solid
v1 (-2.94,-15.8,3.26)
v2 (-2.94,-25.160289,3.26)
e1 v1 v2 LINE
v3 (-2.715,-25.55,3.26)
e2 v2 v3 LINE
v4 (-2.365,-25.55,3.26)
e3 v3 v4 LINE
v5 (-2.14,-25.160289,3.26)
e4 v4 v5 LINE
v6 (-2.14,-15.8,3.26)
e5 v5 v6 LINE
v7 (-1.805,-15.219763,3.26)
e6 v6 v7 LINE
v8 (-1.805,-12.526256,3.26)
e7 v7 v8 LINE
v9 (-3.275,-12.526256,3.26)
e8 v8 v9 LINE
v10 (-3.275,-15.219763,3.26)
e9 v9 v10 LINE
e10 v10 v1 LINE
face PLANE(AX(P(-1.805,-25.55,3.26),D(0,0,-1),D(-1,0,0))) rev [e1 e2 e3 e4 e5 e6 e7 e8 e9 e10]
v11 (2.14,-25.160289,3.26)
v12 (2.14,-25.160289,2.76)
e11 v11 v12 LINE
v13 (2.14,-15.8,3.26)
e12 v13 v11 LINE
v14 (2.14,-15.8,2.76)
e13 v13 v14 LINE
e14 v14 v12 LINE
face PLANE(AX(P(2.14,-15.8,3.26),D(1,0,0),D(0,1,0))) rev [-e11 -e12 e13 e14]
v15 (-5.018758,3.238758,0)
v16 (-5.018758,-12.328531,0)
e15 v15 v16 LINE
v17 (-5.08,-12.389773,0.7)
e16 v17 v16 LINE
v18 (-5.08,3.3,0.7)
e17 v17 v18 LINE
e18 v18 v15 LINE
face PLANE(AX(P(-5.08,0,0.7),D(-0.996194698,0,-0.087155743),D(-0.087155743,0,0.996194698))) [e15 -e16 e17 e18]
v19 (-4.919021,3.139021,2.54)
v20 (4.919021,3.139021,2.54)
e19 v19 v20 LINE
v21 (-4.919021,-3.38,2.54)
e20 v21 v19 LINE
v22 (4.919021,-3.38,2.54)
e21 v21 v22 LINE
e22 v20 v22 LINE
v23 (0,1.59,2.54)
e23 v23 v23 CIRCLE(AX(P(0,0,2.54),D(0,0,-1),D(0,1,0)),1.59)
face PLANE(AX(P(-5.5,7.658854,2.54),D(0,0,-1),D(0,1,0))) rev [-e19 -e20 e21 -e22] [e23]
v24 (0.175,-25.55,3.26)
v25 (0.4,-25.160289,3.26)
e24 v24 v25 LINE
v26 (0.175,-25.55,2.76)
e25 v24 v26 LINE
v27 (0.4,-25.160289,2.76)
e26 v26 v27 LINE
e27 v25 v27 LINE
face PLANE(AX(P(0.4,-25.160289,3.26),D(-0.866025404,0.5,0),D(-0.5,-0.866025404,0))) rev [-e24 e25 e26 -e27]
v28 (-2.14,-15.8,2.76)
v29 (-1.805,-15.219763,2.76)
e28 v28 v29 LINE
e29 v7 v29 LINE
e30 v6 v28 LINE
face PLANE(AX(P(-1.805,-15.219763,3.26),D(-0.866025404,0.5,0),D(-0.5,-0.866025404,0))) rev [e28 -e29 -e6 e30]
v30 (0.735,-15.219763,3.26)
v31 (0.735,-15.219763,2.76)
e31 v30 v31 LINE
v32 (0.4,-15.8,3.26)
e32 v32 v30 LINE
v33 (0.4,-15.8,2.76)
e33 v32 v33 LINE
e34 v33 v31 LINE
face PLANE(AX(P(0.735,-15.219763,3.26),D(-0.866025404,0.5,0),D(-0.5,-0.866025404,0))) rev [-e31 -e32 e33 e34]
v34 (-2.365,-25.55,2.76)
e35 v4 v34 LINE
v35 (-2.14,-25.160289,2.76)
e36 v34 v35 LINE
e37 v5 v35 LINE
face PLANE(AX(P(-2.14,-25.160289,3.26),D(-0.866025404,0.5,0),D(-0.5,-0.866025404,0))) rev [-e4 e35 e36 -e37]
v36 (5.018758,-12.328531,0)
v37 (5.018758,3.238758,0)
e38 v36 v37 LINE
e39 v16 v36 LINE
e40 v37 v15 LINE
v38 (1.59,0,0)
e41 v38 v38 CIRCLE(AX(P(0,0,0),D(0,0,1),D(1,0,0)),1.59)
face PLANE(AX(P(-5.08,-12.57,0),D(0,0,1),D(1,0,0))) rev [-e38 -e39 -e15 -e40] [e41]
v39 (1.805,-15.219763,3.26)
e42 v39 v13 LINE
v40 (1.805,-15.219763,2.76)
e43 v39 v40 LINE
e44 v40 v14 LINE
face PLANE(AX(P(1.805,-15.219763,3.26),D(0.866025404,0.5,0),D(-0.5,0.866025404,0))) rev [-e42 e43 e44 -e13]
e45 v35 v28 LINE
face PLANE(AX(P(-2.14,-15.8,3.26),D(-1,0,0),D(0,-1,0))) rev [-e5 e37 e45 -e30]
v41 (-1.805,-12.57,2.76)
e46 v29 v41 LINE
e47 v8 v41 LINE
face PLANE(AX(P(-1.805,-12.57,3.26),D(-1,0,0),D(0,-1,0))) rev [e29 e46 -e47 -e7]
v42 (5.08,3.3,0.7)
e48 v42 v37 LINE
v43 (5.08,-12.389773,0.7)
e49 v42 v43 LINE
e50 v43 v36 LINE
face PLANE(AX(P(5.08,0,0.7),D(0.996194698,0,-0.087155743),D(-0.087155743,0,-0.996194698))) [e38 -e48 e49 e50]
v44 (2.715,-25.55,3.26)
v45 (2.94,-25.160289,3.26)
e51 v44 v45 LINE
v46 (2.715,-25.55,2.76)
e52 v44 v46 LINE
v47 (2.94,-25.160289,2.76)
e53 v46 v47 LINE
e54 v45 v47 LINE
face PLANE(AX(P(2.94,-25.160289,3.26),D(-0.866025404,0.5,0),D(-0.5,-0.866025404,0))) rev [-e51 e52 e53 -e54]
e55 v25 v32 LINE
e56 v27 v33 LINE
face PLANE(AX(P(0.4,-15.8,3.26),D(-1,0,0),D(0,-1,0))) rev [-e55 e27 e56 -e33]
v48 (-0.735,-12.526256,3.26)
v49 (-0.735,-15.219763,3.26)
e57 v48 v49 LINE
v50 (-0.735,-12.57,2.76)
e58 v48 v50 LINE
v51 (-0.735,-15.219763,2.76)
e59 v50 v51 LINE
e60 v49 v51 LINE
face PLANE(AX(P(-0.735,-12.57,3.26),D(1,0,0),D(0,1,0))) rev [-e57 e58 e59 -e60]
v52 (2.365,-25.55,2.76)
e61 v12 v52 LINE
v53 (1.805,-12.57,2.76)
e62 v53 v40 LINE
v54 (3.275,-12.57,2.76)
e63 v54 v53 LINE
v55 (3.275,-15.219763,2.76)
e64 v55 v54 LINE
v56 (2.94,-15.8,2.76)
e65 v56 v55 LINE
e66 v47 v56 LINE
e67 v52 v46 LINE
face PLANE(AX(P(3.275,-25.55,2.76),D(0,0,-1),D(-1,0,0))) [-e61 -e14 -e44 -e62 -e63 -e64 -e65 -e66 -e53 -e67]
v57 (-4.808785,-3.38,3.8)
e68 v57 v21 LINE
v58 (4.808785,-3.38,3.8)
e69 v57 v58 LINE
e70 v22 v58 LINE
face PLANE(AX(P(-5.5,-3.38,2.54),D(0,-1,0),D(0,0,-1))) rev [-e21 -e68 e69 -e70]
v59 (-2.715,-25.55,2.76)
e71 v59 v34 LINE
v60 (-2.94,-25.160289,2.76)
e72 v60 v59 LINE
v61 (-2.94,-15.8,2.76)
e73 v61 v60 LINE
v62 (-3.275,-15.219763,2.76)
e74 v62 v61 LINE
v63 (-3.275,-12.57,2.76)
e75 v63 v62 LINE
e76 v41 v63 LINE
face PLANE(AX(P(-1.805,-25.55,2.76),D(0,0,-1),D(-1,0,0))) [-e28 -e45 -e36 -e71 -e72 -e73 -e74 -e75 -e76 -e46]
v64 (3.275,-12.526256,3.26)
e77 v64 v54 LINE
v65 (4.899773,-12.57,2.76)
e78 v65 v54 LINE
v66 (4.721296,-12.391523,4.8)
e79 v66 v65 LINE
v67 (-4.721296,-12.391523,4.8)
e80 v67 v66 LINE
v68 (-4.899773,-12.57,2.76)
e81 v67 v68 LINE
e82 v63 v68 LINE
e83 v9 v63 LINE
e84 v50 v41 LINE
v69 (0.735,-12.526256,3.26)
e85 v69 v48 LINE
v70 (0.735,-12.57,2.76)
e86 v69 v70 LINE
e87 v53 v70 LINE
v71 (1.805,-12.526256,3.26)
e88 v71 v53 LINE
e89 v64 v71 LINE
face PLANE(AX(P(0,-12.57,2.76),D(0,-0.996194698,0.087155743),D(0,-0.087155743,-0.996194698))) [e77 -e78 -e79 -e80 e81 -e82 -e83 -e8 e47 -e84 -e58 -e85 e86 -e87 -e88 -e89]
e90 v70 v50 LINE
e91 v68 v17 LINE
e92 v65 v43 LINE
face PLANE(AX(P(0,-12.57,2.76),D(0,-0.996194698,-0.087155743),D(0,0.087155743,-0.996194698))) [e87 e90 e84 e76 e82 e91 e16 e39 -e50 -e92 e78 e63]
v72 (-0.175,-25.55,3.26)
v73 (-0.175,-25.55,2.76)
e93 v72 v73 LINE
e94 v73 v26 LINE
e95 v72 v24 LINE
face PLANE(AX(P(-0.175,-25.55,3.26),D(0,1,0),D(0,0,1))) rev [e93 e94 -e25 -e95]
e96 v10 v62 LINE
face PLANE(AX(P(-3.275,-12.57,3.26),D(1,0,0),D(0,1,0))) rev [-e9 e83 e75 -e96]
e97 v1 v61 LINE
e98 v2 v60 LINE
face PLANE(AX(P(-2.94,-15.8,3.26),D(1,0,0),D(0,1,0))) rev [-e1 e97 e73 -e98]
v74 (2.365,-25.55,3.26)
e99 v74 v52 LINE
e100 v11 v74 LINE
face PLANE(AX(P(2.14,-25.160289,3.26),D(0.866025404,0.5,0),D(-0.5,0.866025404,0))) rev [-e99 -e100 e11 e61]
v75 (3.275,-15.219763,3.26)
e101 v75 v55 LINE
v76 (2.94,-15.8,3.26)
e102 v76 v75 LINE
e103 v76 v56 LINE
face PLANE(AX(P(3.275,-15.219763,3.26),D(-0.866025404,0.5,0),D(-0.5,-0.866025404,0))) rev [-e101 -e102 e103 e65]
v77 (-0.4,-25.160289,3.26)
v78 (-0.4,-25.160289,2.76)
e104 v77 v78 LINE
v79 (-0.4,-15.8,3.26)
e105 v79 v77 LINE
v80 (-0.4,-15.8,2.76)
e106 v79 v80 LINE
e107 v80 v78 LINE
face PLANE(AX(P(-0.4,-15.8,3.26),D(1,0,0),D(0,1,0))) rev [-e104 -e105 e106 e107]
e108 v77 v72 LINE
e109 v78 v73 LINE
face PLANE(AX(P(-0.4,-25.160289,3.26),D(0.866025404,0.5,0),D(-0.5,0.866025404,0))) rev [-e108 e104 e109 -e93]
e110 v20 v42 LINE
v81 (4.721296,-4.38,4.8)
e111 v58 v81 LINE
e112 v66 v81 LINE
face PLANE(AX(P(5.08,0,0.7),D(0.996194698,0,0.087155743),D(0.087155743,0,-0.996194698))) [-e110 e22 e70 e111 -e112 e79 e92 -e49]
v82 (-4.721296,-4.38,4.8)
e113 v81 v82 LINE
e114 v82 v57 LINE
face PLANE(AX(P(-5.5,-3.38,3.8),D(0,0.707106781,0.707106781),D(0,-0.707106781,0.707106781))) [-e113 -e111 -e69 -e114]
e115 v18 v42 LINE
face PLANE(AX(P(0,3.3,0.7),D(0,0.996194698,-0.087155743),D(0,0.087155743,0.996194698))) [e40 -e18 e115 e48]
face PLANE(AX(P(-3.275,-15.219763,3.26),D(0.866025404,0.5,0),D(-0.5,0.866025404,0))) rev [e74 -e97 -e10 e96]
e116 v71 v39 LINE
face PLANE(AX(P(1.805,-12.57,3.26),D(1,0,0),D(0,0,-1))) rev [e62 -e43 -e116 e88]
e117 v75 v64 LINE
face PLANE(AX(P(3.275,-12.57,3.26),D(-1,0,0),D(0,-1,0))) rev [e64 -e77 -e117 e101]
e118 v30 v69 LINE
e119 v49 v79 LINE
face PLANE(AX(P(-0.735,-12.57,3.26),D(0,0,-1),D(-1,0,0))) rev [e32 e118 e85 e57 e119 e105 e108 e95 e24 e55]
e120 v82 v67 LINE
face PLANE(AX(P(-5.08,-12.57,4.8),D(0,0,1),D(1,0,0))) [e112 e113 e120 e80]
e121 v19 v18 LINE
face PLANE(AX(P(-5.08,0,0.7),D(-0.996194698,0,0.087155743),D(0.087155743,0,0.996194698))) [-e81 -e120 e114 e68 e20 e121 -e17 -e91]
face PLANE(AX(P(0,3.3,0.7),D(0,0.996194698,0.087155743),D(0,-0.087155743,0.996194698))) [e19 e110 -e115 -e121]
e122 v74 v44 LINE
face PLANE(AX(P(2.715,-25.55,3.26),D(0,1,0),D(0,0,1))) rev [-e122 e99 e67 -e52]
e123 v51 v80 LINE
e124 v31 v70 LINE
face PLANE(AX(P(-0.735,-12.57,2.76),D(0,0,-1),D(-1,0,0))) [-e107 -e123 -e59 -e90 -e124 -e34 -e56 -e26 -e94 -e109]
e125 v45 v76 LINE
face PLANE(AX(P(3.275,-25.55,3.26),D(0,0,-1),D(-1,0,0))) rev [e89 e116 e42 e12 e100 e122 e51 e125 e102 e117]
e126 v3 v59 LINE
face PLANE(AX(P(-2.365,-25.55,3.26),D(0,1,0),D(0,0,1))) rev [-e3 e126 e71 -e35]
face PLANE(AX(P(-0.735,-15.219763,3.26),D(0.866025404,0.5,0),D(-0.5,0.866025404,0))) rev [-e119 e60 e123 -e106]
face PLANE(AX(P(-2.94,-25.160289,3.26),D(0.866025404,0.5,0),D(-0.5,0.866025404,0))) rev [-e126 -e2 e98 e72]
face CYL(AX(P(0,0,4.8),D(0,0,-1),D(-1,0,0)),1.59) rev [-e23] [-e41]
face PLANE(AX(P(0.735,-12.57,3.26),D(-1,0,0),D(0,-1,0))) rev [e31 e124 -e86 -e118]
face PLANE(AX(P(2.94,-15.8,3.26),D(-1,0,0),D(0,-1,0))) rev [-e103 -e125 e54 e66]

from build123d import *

# Parameters (mm, degrees)
SKETCH1_W          = 10.16
SKETCH1_H          = 15.87
SKETCH1_R          = 1.59
EXTRUDE1_DEPTH     = 4.8
SKETCH2_W          = 4.533761675
SKETCH2_H          = 11.038854263
CUT_EXTRUDE1_DEPTH = 5.5
CHAMFER1_SIZE      = 1
EXTRUDE2_DEPTH     = 0.5
DRAFT1_START       = -14
DRAFT1_DEPTH       = 17.3
DRAFT1_START_2     = 3.226433484
DRAFT1_2_OUTLINE_W = 14
DRAFT1_2_OUTLINE_H = 3
DRAFT1_2_DEPTH     = 0.773566516
DRAFT2_ANGLE       = -5
DRAFT4_START       = -5.08
DRAFT4_DEPTH       = 10.16
DRAFT4_2_DEPTH     = 1.805
DRAFT4_START_2     = 3.275
DRAFT4_3_DEPTH     = 1.805
DRAFT4_START_3     = -1.805
DRAFT4_4_DEPTH     = 1.07
DRAFT4_START_4     = 0.735
DRAFT4_5_DEPTH     = 1.07
DRAFT3_ANGLE       = 5


with BuildPart() as part:
    # Sketch1 → Extrude1 (new body)
    with BuildSketch(Plane.XY):
        with Locations((0, -4.635)):
            Rectangle(SKETCH1_W, SKETCH1_H)
        Circle(SKETCH1_R, mode=Mode.SUBTRACT)
    extrude(amount=EXTRUDE1_DEPTH)

    # Sketch2 → Cut-Extrude1 (cut, symmetric)
    with BuildSketch(Plane(origin=(0, 0, 0), x_dir=(0, 0, -1), z_dir=(1, 0, 0))):
        with Locations((-4.806880837, 2.139427131)):
            Rectangle(SKETCH2_W, SKETCH2_H)
    extrude(amount=CUT_EXTRUDE1_DEPTH, both=True, mode=Mode.SUBTRACT)

    # Chamfer1
    chamfer1_edges = [part.edges().sort_by_distance(p)[0] for p in [
        (0, -3.38, 4.8),
    ]]
    chamfer(chamfer1_edges, length=CHAMFER1_SIZE)

    # Sketch3 → Extrude2 (add)
    with BuildSketch(Plane.XY.offset(2.76)):
        Polygon((0.735, -12.57), (0.735, -15.219762979), (0.4, -15.8), (0.4, -25.160288568), (0.175, -25.55), (-0.175, -25.55), (-0.4, -25.160288568), (-0.4, -15.8), (-0.735, -15.219762979), (-0.735, -12.57), align=None)
        Polygon((3.275, -12.57), (1.805, -12.57), (1.805, -15.219762979), (2.14, -15.8), (2.14, -25.160288568), (2.365, -25.55), (2.715, -25.55), (2.94, -25.160288568), (2.94, -15.8), (3.275, -15.219762979), align=None)
        Polygon((-1.805, -12.57), (-3.275, -12.57), (-3.275, -15.219762979), (-2.94, -15.8), (-2.94, -25.160288568), (-2.715, -25.55), (-2.365, -25.55), (-2.14, -25.160288568), (-2.14, -15.8), (-1.805, -15.219762979), align=None)
    extrude(amount=EXTRUDE2_DEPTH)

    # Draft1: read off the stored shape, not the designer's step
    # Draft1 outline → Draft1 (cut)
    with BuildSketch(Plane(origin=(0, 0, 0), x_dir=(1, 0, 0), z_dir=(0, 1, 0)).offset(DRAFT1_START)):
        Polygon((5.08, 0), (5.018757936, 0), (5.08, -0.7), align=None)
        Polygon((-5.08, -0.7), (-5.018757936, 0), (-5.08, 0), align=None)
    extrude(amount=DRAFT1_DEPTH, mode=Mode.SUBTRACT)

    # Draft1 2 outline → Draft1 2 (cut)
    with BuildSketch(Plane(origin=(0, 0, 0), x_dir=(1, 0, 0), z_dir=(0, 0.9961946980917455, -0.08715574274765836)).offset(DRAFT1_START_2)):
        with Locations((0, -0.5)):
            Rectangle(DRAFT1_2_OUTLINE_W, DRAFT1_2_OUTLINE_H)
    extrude(amount=DRAFT1_2_DEPTH, mode=Mode.SUBTRACT)

    # Draft2
    draft2_faces = [part.faces().sort_by_distance(p)[0] for p in [
        (5.08, -6.046569578, 2.451893477),
        (-5.08, -6.046569578, 2.451893477),
        (0, 3.3, 1.62),
    ]]
    draft(draft2_faces, Plane(origin=(0, 0, 0.7), x_dir=(-1, 0, 0), z_dir=(0, 0, -1)), DRAFT2_ANGLE)

    # Draft4: read off the stored shape, not the designer's step
    # Draft4 outline → Draft4 (cut)
    with BuildSketch(Plane.YZ.offset(DRAFT4_START)):
        Polygon((-12.526255668, 3.26), (-12.391523126, 4.8), (-12.57, 4.8), (-12.57, 3.26), align=None)
    extrude(amount=DRAFT4_DEPTH, mode=Mode.SUBTRACT)

    # Draft4 2 outline → Draft4 2 (cut)
    with BuildSketch(Plane.YZ.offset(DRAFT4_START)):
        Polygon((-12.57, 2.76), (-12.526255668, 3.26), (-12.57, 3.26), align=None)
    extrude(amount=DRAFT4_2_DEPTH, mode=Mode.SUBTRACT)

    # Draft4 3 outline → Draft4 3 (cut)
    with BuildSketch(Plane.YZ.offset(DRAFT4_START_2)):
        Polygon((-12.57, 2.76), (-12.526255668, 3.26), (-12.57, 3.26), align=None)
    extrude(amount=DRAFT4_3_DEPTH, mode=Mode.SUBTRACT)

    # Draft4 4 outline → Draft4 4 (cut)
    with BuildSketch(Plane.YZ.offset(DRAFT4_START_3)):
        Polygon((-12.57, 2.76), (-12.526255668, 3.26), (-12.57, 3.26), align=None)
    extrude(amount=DRAFT4_4_DEPTH, mode=Mode.SUBTRACT)

    # Draft4 5 outline → Draft4 5 (cut)
    with BuildSketch(Plane.YZ.offset(DRAFT4_START_4)):
        Polygon((-12.57, 2.76), (-12.526255668, 3.26), (-12.57, 3.26), align=None)
    extrude(amount=DRAFT4_5_DEPTH, mode=Mode.SUBTRACT)

    # Draft3
    draft3_faces = [part.faces().sort_by_distance(p)[0] for p in [
        (0, -12.57, 1.372462039),
    ]]
    draft(draft3_faces, Plane(origin=(0, 0, 2.76), x_dir=(-1, 0, 0), z_dir=(0, 0, -1)), DRAFT3_ANGLE)


solid = part.part
